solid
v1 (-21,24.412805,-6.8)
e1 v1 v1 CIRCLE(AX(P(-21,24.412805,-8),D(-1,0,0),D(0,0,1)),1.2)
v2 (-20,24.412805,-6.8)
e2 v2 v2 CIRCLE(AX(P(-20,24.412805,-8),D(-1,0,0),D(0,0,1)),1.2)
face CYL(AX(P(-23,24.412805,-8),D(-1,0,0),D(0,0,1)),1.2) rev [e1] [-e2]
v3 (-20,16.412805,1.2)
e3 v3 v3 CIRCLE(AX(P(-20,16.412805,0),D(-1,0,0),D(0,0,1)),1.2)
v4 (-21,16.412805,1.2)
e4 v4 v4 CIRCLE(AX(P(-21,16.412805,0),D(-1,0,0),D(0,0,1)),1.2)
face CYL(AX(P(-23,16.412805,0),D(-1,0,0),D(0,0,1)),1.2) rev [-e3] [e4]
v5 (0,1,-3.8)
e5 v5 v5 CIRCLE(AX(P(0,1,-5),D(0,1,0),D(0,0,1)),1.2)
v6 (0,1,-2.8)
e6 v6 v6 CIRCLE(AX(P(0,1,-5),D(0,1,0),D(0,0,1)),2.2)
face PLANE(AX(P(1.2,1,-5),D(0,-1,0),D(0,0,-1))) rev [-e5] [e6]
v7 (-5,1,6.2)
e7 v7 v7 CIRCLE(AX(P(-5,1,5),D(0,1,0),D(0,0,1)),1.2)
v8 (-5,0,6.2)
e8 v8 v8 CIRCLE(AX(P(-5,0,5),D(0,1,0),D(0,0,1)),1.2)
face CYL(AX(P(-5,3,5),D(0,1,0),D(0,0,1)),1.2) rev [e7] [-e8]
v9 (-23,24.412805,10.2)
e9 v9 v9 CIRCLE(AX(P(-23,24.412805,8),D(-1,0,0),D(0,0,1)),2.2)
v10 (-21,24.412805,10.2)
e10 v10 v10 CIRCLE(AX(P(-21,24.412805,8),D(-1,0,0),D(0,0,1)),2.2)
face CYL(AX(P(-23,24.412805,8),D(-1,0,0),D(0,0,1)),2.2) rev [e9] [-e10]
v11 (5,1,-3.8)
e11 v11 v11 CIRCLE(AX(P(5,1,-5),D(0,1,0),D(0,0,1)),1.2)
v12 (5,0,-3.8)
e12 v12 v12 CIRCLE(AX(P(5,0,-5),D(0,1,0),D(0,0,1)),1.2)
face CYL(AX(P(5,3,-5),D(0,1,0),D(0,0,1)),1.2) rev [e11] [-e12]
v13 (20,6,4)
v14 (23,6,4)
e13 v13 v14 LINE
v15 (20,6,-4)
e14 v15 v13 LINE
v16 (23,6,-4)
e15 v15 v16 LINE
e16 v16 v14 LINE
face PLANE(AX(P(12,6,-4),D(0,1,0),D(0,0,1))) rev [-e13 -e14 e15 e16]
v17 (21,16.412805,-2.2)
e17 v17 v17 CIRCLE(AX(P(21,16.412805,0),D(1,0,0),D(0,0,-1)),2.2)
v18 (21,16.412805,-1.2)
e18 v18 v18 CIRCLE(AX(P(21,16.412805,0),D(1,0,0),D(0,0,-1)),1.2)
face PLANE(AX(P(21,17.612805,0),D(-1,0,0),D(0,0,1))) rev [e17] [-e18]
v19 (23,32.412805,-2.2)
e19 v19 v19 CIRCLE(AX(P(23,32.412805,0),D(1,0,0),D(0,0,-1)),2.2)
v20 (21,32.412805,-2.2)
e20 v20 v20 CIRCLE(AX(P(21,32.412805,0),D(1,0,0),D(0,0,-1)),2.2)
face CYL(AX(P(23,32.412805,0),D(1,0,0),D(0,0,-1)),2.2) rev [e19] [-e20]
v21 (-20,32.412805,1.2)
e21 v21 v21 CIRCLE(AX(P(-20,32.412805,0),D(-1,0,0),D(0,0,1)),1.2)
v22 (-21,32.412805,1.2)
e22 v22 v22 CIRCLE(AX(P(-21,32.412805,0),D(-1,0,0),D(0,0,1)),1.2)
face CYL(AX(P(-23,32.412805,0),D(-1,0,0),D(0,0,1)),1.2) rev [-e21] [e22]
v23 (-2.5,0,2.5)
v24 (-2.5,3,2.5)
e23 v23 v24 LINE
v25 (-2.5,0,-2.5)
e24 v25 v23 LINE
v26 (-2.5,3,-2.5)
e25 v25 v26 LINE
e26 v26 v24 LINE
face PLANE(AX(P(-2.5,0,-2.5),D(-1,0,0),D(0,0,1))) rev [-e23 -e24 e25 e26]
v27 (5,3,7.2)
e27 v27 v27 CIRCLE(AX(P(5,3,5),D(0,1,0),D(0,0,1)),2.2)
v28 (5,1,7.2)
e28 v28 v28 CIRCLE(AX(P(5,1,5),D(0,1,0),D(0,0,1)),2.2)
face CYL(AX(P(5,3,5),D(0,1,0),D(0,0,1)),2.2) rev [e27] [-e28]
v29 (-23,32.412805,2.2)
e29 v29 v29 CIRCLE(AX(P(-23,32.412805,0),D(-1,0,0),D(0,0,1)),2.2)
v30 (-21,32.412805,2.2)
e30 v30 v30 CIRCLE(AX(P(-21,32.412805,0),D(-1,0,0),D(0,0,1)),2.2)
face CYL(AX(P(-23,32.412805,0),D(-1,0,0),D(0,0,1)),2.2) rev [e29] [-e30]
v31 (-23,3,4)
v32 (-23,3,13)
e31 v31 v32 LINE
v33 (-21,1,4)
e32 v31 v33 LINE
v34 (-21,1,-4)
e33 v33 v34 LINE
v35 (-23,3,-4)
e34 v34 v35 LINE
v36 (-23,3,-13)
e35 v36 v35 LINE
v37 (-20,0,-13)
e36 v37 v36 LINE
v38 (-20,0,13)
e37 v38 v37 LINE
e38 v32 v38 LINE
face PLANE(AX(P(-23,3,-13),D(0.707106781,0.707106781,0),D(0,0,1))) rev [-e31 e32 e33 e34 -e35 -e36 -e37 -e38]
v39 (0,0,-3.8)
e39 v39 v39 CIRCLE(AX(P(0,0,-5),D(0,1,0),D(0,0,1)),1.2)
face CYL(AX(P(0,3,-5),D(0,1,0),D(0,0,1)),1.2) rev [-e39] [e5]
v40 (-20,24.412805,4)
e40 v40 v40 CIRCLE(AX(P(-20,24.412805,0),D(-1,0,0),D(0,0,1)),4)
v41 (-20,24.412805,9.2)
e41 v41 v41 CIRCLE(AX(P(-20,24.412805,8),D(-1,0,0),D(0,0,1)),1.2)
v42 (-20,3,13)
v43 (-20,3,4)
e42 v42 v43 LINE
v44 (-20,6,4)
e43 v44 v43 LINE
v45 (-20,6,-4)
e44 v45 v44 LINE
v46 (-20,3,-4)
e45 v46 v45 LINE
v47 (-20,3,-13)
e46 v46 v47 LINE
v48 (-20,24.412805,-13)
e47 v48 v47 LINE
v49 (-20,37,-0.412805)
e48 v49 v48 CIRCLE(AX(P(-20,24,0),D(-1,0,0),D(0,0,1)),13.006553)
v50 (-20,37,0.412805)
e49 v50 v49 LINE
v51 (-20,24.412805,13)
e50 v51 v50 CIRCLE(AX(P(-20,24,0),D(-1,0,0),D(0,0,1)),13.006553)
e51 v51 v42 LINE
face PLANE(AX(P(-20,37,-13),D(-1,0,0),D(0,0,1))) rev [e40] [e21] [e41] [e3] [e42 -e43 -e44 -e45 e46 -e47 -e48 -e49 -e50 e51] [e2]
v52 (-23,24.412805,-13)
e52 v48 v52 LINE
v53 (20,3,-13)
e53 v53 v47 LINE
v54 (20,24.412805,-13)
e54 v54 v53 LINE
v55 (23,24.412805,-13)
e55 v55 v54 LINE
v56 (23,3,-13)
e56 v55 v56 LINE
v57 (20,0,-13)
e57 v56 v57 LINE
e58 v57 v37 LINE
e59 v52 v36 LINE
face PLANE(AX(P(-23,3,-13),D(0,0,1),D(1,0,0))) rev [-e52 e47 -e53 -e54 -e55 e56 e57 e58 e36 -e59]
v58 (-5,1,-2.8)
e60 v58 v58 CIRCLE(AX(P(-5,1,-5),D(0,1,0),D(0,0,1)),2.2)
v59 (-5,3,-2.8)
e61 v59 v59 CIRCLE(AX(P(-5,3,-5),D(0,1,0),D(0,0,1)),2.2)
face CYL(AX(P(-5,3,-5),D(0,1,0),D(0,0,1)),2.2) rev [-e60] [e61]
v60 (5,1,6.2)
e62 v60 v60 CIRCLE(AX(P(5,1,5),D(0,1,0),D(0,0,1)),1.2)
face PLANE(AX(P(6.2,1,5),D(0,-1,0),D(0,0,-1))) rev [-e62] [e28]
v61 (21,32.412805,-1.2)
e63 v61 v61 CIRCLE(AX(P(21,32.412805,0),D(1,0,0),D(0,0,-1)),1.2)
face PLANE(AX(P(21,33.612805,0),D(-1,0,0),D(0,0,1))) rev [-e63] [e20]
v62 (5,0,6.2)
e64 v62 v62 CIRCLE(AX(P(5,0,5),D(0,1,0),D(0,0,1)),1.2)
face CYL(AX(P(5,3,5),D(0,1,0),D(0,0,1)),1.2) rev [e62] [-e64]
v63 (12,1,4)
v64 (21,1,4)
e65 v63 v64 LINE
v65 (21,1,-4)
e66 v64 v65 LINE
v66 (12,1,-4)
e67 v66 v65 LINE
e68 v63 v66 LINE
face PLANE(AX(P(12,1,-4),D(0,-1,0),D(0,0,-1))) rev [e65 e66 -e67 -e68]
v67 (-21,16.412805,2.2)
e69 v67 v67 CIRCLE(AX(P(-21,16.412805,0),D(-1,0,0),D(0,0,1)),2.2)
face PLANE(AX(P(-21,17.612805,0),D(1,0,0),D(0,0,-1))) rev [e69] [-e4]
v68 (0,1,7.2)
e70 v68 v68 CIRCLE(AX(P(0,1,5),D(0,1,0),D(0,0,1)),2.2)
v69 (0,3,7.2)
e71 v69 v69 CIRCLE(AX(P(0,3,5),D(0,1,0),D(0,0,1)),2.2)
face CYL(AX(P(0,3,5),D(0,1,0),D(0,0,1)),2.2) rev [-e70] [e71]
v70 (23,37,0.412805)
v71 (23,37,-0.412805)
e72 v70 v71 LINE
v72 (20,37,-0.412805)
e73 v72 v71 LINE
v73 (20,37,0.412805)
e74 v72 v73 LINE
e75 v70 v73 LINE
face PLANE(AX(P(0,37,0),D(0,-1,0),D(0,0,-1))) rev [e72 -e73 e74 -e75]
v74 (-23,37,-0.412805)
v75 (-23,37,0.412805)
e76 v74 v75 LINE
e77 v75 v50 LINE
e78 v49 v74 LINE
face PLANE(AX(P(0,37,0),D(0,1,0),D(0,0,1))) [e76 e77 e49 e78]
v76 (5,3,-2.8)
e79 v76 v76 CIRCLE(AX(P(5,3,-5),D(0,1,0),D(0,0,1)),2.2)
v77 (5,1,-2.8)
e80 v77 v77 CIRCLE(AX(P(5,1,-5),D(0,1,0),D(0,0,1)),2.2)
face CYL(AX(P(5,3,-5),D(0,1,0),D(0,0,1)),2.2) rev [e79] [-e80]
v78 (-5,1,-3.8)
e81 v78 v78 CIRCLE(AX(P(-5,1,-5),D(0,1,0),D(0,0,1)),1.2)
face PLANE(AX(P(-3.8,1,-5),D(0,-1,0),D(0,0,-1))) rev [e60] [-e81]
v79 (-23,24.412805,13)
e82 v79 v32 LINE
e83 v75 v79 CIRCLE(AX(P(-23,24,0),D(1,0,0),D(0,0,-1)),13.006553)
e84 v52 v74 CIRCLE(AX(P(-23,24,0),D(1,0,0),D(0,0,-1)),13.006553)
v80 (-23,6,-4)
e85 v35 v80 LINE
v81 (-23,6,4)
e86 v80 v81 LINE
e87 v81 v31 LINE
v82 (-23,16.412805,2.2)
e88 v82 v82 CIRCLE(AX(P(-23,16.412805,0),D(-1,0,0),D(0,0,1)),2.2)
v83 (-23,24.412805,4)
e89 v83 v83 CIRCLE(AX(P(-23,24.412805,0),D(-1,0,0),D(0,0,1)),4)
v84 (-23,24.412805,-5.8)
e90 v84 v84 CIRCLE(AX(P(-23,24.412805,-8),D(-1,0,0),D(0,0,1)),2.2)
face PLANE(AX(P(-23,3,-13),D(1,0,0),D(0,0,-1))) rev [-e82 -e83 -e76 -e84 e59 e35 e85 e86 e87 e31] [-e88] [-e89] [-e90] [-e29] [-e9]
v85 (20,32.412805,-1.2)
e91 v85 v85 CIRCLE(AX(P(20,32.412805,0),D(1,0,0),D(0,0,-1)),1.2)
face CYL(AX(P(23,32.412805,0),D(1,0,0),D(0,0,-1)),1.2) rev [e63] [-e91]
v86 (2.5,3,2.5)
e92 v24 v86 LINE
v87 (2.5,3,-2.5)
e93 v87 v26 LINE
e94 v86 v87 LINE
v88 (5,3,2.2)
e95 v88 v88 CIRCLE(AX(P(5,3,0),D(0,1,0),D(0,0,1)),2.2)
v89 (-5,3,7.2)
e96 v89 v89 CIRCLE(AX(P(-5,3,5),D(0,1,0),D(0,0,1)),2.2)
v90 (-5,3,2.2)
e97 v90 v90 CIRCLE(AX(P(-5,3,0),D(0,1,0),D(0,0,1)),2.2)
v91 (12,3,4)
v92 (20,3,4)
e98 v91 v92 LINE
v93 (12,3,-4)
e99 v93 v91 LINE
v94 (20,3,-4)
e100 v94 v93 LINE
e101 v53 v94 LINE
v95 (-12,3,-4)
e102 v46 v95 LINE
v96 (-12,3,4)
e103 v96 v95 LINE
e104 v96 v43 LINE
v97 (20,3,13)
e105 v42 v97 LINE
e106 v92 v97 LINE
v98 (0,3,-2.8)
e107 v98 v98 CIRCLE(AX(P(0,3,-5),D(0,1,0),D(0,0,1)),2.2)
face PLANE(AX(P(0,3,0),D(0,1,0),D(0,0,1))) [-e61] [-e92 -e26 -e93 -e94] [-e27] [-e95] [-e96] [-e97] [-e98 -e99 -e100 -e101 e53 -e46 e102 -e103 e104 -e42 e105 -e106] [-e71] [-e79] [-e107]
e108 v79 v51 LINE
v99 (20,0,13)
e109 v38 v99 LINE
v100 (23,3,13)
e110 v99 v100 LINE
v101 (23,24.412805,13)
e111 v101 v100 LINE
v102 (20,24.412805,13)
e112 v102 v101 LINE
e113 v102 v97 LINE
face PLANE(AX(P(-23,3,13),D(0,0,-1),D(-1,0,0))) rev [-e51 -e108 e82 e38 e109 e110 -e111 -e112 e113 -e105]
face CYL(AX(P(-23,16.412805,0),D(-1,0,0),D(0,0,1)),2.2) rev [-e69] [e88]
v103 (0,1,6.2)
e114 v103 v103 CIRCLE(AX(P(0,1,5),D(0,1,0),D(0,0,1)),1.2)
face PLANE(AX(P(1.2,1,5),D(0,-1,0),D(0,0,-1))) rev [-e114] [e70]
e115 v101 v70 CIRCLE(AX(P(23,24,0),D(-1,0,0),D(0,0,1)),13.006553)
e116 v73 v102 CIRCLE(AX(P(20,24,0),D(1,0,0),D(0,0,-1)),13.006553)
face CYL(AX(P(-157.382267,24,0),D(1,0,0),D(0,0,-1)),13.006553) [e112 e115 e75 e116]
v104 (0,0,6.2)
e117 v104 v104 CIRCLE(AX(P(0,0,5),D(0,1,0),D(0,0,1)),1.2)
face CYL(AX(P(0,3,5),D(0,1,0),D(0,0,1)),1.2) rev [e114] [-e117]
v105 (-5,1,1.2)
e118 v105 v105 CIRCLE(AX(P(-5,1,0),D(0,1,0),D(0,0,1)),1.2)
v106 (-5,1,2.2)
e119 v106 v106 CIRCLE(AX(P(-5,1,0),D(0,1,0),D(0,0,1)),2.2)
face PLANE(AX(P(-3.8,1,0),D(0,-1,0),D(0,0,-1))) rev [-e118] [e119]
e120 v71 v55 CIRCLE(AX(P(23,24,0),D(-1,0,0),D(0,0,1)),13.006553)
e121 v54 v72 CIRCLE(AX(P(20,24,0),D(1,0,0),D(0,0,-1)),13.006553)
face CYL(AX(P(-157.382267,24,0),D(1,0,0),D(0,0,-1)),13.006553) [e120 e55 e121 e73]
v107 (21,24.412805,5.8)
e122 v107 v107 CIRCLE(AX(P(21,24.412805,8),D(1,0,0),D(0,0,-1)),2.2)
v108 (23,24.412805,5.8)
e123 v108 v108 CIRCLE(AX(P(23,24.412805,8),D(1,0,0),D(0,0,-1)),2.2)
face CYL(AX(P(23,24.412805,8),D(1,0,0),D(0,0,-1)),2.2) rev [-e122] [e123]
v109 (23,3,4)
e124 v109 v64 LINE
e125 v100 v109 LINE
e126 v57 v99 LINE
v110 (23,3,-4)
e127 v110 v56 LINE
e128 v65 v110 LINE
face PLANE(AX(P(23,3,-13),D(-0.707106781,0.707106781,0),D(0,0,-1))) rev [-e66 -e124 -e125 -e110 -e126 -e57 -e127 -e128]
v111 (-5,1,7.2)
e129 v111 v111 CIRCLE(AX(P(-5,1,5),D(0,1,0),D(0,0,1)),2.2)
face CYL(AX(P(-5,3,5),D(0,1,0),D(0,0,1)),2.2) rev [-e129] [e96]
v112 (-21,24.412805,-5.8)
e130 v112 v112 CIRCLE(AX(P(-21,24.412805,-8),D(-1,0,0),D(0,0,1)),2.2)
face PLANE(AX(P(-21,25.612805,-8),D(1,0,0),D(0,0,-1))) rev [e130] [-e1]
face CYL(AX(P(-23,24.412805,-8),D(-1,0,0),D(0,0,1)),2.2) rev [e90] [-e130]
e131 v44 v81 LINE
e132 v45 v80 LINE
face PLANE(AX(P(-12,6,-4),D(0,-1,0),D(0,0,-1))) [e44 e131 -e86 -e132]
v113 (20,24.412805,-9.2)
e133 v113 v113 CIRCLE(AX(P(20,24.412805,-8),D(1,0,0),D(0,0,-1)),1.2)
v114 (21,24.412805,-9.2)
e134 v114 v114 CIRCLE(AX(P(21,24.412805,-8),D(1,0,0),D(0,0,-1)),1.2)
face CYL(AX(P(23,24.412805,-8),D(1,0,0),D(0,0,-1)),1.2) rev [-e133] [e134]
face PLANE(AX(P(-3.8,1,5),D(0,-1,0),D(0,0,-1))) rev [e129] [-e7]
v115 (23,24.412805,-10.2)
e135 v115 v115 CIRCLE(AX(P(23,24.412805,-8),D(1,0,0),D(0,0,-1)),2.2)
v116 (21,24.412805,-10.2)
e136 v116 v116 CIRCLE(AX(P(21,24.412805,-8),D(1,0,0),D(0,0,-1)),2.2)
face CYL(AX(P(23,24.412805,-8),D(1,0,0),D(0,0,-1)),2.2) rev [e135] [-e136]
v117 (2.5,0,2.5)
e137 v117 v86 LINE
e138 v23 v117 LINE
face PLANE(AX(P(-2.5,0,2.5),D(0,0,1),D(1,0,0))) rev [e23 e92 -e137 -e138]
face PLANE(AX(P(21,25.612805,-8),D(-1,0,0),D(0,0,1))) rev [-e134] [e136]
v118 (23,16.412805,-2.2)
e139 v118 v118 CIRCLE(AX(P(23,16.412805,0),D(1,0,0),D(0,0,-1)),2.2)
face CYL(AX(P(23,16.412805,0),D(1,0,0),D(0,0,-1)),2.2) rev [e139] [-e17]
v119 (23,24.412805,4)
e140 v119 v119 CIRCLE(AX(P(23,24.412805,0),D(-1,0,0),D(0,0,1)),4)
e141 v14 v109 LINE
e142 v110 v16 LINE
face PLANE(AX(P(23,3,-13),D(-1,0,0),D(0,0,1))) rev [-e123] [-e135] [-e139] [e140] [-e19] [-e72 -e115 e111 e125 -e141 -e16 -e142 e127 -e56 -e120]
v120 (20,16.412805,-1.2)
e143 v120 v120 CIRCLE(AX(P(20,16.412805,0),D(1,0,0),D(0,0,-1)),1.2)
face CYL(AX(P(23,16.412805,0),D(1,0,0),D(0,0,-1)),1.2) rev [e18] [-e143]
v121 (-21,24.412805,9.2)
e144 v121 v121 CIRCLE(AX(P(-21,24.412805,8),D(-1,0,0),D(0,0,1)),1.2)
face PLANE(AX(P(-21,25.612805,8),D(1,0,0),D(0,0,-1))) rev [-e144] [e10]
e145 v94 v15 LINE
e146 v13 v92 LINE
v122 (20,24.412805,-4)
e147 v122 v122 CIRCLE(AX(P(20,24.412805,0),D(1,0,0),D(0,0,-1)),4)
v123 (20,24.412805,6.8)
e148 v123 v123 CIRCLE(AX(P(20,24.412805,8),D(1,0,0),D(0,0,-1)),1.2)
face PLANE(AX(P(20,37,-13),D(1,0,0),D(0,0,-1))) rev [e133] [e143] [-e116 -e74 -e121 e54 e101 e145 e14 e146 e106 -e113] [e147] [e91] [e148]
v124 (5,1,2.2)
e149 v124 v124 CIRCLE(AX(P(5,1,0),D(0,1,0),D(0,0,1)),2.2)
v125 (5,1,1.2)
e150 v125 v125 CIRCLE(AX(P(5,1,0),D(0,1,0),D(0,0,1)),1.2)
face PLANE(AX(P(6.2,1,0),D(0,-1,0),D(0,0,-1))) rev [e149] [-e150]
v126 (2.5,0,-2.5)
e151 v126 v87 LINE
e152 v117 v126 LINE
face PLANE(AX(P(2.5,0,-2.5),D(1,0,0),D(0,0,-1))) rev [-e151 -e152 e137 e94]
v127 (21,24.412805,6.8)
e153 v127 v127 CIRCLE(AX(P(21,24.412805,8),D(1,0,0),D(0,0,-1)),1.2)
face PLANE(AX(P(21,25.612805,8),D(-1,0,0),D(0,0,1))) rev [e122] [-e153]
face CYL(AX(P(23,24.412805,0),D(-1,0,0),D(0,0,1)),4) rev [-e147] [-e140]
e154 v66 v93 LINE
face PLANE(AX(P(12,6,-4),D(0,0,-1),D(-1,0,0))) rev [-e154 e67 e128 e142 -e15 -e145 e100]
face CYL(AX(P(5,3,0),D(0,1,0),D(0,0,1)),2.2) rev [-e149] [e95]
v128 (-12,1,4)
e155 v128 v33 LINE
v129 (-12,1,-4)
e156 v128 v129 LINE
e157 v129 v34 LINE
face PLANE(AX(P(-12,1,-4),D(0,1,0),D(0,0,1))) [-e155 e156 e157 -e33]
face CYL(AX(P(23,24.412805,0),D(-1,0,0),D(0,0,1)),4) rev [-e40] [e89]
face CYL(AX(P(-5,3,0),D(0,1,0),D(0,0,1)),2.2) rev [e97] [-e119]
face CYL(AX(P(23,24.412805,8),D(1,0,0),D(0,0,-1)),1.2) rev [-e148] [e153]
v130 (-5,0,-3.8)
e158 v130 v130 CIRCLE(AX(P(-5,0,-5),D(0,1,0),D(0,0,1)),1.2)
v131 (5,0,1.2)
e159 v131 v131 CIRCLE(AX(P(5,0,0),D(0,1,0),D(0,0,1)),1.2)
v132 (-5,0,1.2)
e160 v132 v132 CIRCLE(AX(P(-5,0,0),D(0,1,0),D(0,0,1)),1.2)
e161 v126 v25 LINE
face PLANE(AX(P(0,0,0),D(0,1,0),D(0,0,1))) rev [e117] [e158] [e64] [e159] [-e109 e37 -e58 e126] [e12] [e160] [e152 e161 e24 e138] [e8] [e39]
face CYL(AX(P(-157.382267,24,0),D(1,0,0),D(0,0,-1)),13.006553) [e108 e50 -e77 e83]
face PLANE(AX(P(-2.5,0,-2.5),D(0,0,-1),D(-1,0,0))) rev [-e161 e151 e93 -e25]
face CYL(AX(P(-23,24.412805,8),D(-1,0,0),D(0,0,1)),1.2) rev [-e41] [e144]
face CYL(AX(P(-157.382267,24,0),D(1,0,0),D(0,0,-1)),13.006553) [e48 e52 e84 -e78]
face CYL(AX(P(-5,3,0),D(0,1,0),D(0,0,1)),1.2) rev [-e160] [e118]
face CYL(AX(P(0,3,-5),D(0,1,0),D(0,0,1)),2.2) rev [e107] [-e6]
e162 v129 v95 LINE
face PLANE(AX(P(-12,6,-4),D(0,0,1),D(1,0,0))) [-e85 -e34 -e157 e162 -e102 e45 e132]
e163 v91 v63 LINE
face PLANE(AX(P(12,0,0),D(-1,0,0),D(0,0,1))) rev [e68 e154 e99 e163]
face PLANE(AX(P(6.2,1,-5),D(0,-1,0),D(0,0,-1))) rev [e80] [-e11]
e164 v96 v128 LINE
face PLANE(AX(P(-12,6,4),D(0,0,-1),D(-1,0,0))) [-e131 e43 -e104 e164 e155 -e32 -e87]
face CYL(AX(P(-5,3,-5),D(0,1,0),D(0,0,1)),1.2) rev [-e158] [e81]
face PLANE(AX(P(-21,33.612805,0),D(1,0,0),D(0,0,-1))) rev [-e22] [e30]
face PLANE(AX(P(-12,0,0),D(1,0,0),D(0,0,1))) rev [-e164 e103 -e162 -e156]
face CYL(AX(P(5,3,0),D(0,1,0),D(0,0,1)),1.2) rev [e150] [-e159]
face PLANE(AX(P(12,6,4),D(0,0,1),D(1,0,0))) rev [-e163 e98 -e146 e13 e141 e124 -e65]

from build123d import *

# Parameters (mm, degrees)
SKETCH_1_W                   = 46
SKETCH_1_H                   = 26
EXTRUDE_1_DEPTH              = 3
SKETCH_2_W                   = 3
SKETCH_2_H                   = 26
EXTRUDE_2_DEPTH              = 34
CUT_EXTRUDE_START            = -46
CUT_EXTRUDE_1_DEPTH          = 46
SKETCH_4_R                   = 4
CUT_EXTRUDE_2_DEPTH          = 61.448325039
HOLE_START                   = -23
HOLE_WIZARD_M2_2_OUTLINE_R   = 2.2
HOLE_WIZARD_M2_2_DEPTH       = 2
HOLE_START_2                 = -21
HOLE_WIZARD_M2_2_2_OUTLINE_R = 1.2
HOLE_WIZARD_M2_2_2_DEPTH     = 1
CHAMFER_1_SIZE               = 3
SKETCH_15_W                  = 8
SKETCH_15_H                  = 5
CUT_EXTRUDE_8_DEPTH          = 11
CUT_EXTRUDE_9_DEPTH          = 44.058100283
CUT_EXTRUDE_9_DEPTH_BACK     = 44.058100283
SKETCH_18_W                  = 5
SKETCH_18_H                  = 5
HOLE_WIZARD_M2_4_D           = 2.4
HOLE_WIZARD_M2_4_CBORE_D     = 4.4
HOLE_WIZARD_M2_4_CBORE_DEPTH = 2


# Read off the part's stored shape, not the designer's step: 切除-拉伸1, M2 凹头盖螺钉的柱形沉头孔2
with BuildPart() as part:
    # 草图1 → 凸台-拉伸1 (new body)
    with BuildSketch(Plane(origin=(0, 0, 0), x_dir=(1, 0, 0), z_dir=(0, 1, 0))):
        Rectangle(SKETCH_1_W, SKETCH_1_H)
    extrude(amount=EXTRUDE_1_DEPTH)

    # 草图2 → 凸台-拉伸2 (add)
    with BuildSketch(Plane(origin=(0, 3, 0), x_dir=(1, 0, 0), z_dir=(0, 1, 0))):
        with Locations((-21.5, 0)):
            Rectangle(SKETCH_2_W, SKETCH_2_H)
        with Locations((21.5, 0)):
            Rectangle(SKETCH_2_W, SKETCH_2_H)
    extrude(amount=EXTRUDE_2_DEPTH)

    # 切除-拉伸1 outline → 切除-拉伸1 (cut)
    with BuildSketch(Plane.ZY.offset(23).offset(CUT_EXTRUDE_START)):
        with BuildLine():
            Line((13, 37), (0.412804961, 37))
            ThreePointArc((0.412804961, 37), (9.197021473, 33.197021473), (13, 24.412804961))
            Line((13, 24.412804961), (13, 37))
        make_face()
        with BuildLine():
            ThreePointArc((-13, 24.412804961), (-9.197021473, 33.197021473), (-0.412804961, 37))
            Line((-0.412804961, 37), (-13, 37))
            Line((-13, 37), (-13, 24.412804961))
        make_face()
    extrude(amount=CUT_EXTRUDE_1_DEPTH, mode=Mode.SUBTRACT)

    # 草图4 → 切除-拉伸2 (cut, through all)
    with BuildSketch(Plane.ZY.offset(23)):
        with Locations((0, 24.412804961)):
            Circle(SKETCH_4_R)
    extrude(amount=-CUT_EXTRUDE_2_DEPTH, mode=Mode.SUBTRACT)

    # M2 凹头盖螺钉的柱形沉头孔2 outline → M2 凹头盖螺钉的柱形沉头孔2 (cut)
    with BuildSketch(Plane.YZ.offset(HOLE_START)):
        with Locations((16.412804961, 0)):
            Circle(HOLE_WIZARD_M2_2_OUTLINE_R)
        with Locations((24.412804961, 8)):
            Circle(HOLE_WIZARD_M2_2_OUTLINE_R)
        with Locations((24.412804961, -8)):
            Circle(HOLE_WIZARD_M2_2_OUTLINE_R)
        with Locations((32.412804961, 0)):
            Circle(HOLE_WIZARD_M2_2_OUTLINE_R)
    hole_wizard_m2_2 = extrude(amount=HOLE_WIZARD_M2_2_DEPTH, mode=Mode.SUBTRACT)

    # Hole Wizard M2 _2 2 outline → Hole Wizard M2 _2 2 (cut)
    with BuildSketch(Plane.YZ.offset(HOLE_START_2)):
        with Locations((16.412804961, 0)):
            Circle(HOLE_WIZARD_M2_2_2_OUTLINE_R)
        with Locations((24.412804961, 8)):
            Circle(HOLE_WIZARD_M2_2_2_OUTLINE_R)
        with Locations((24.412804961, -8)):
            Circle(HOLE_WIZARD_M2_2_2_OUTLINE_R)
        with Locations((32.412804961, 0)):
            Circle(HOLE_WIZARD_M2_2_2_OUTLINE_R)
    hole_wizard_m2_2_2 = extrude(amount=HOLE_WIZARD_M2_2_2_DEPTH, mode=Mode.SUBTRACT)

    # 镜向2: M2 凹头盖螺钉的柱形沉头孔2, Hole Wizard M2 _2 2 across plane
    add(hole_wizard_m2_2.mirror(Plane(origin=(0, 0, 0), x_dir=(0, 0, 1), z_dir=(1, 0, 0))), mode=Mode.SUBTRACT)
    add(hole_wizard_m2_2_2.mirror(Plane(origin=(0, 0, 0), x_dir=(0, 0, 1), z_dir=(1, 0, 0))), mode=Mode.SUBTRACT)

    # 倒角1
    chamfer_1_edges = [part.edges().sort_by_distance(p)[0] for p in [
        (-23, 0, 0),
        (23, 0, 0),
    ]]
    chamfer(chamfer_1_edges, length=CHAMFER_1_SIZE)

    # 草图15 → 切除-拉伸8 (cut)
    with BuildSketch(Plane(origin=(23, 0, 0), x_dir=(0, 0, -1), z_dir=(1, 0, 0))):
        with Locations((0, 3.5)):
            Rectangle(SKETCH_15_W, SKETCH_15_H)
    cut_extrude_8 = extrude(amount=-CUT_EXTRUDE_8_DEPTH, mode=Mode.SUBTRACT)

    # 镜向3: 切除-拉伸8 across plane
    add(cut_extrude_8.mirror(Plane(origin=(0, 0, 0), x_dir=(0, 0, 1), z_dir=(1, 0, 0))), mode=Mode.SUBTRACT)

    # 草图18 → 切除-拉伸9 (cut, two sides: drawn at the far end of the back side and taken through both)
    with BuildSketch(Plane(origin=(0, 3, 0), x_dir=(1, 0, 0), z_dir=(0, 1, 0)).offset(-CUT_EXTRUDE_9_DEPTH_BACK)):
        Rectangle(SKETCH_18_W, SKETCH_18_H)
    extrude(amount=CUT_EXTRUDE_9_DEPTH + CUT_EXTRUDE_9_DEPTH_BACK, mode=Mode.SUBTRACT)

    # M2 凹头盖螺钉的柱形沉头孔4 (through all)
    with Locations(Plane(origin=(-5, 3, -5), x_dir=(0, 0, 1), z_dir=(0, 1, 0))):
        with Locations((0, 0), (5, 0), (10, 0), (10, 5), (10, 10), (5, 10), (0, 10), (0, 5)):
            CounterBoreHole(HOLE_WIZARD_M2_4_D / 2, HOLE_WIZARD_M2_4_CBORE_D / 2, HOLE_WIZARD_M2_4_CBORE_DEPTH)


solid = part.part
